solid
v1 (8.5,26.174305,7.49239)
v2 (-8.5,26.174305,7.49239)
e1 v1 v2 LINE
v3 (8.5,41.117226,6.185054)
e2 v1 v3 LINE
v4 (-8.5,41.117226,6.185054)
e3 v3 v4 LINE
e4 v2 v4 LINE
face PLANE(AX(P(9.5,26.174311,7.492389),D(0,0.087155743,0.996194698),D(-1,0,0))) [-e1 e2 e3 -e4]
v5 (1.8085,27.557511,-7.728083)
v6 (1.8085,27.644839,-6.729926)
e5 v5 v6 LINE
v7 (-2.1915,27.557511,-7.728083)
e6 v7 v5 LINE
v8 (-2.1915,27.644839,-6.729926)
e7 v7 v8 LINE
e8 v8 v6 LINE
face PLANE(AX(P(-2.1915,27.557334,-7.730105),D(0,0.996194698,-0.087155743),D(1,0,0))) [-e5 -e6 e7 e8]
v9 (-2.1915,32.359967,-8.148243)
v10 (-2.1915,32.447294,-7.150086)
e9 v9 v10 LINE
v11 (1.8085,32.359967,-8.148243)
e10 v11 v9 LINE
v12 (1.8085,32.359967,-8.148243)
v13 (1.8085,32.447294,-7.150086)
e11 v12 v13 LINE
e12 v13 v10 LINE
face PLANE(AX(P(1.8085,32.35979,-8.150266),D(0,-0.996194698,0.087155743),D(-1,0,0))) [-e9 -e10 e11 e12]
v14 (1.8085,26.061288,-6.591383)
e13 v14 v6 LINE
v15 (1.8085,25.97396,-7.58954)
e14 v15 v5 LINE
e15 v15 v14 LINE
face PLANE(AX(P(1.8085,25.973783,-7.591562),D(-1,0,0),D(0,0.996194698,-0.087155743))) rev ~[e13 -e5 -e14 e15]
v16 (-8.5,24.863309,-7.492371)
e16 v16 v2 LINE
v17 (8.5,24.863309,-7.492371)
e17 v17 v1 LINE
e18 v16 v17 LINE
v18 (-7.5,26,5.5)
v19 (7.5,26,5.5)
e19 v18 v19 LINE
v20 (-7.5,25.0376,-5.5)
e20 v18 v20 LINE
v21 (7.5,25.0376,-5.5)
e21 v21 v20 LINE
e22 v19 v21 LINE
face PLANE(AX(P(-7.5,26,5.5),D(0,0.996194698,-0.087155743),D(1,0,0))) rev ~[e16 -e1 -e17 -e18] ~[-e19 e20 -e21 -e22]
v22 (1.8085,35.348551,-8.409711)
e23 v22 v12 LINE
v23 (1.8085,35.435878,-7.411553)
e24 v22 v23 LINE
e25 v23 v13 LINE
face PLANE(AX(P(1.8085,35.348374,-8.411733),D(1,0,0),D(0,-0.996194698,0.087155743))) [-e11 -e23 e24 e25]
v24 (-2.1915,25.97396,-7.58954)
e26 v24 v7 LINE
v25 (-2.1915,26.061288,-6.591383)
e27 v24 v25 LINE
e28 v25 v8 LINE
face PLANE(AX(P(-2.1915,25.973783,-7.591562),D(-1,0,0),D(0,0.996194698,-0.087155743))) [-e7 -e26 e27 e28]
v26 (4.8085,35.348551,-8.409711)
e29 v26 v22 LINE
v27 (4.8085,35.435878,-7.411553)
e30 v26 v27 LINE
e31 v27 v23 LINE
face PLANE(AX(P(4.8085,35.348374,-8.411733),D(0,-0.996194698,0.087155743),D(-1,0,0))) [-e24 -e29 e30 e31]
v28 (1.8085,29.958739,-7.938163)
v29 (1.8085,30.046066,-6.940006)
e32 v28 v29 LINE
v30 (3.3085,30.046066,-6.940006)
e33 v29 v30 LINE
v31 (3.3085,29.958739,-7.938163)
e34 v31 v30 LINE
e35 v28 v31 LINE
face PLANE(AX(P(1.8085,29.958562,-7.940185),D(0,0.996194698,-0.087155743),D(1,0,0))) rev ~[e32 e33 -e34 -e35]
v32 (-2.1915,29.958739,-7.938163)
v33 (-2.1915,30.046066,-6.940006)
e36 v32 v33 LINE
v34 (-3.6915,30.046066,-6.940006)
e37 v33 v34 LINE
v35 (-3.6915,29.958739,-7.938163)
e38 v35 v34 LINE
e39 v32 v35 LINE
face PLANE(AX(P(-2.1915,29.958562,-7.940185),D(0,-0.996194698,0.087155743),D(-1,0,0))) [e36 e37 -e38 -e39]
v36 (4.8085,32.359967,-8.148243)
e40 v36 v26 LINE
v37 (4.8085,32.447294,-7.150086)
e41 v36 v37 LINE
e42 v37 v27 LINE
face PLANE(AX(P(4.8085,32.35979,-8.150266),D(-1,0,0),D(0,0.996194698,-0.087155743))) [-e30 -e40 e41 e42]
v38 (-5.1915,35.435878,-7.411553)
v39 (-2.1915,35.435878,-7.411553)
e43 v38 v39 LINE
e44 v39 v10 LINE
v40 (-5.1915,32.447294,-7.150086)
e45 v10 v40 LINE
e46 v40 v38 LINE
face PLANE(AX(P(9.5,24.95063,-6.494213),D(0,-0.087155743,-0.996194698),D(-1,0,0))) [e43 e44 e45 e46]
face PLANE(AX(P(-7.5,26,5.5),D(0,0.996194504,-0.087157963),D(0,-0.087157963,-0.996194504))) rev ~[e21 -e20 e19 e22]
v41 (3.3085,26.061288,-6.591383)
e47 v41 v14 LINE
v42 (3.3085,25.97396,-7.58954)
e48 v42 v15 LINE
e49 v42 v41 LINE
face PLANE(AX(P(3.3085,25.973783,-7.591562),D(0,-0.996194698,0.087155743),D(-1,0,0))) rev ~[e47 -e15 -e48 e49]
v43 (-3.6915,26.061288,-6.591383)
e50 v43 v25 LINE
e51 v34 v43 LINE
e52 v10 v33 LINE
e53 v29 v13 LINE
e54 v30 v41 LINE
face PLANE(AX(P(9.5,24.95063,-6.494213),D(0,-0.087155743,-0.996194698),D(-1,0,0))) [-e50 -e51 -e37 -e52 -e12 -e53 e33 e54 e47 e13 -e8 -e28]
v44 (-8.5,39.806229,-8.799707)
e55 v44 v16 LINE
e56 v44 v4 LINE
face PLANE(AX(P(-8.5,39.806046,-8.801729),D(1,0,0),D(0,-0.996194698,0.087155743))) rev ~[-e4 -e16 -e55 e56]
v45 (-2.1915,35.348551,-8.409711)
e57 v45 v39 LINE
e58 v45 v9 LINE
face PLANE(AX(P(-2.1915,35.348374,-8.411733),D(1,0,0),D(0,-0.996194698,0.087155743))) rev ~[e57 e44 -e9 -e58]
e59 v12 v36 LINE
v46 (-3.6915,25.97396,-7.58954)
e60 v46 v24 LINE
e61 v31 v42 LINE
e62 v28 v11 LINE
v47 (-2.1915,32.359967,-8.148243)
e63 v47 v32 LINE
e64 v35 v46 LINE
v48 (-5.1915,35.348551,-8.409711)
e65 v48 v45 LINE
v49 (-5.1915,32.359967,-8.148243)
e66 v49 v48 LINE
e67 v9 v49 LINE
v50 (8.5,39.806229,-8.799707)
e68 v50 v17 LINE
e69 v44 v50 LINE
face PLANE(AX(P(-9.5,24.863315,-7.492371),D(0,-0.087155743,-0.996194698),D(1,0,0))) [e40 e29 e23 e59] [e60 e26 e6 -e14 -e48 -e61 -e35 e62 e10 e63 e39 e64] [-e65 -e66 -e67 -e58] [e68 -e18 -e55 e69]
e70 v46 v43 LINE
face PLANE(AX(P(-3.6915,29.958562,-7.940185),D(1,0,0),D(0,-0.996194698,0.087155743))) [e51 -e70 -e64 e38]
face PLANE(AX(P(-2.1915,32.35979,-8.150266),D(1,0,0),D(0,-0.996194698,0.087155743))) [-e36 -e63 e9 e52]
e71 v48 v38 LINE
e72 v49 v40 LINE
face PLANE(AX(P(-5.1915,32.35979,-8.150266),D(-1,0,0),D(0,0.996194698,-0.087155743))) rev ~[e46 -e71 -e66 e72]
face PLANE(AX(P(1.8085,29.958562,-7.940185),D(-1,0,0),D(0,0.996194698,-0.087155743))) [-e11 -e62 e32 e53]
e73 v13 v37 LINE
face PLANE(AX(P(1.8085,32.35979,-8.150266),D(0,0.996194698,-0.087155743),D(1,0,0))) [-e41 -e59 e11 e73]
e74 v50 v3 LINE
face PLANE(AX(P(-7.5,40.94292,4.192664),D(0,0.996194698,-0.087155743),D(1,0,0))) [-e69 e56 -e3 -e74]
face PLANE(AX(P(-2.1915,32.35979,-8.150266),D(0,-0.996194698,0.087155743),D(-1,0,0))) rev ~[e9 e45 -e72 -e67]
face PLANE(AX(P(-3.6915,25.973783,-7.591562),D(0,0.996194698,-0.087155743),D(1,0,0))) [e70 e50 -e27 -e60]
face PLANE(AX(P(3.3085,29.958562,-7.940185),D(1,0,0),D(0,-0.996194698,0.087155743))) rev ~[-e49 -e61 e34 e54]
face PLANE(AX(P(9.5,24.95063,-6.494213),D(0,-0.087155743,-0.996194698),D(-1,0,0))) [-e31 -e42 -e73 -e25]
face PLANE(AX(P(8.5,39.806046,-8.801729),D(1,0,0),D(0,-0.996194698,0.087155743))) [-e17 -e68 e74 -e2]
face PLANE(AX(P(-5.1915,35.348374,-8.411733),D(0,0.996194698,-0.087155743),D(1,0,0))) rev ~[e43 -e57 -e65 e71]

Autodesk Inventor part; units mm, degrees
ref_plane "YZ Plane" through (0, 0, 0) normal (1, 0, 0) x (0, 1, 0)
ref_plane "XZ Plane" through (0, 0, 0) normal (0, 1, 0) x (-1, 0, 0)
ref_plane "XY Plane" through (0, 0, 0) normal (0, 0, 1) x (1, 0, 0)
sketch "スケッチ1" plane through (0, 0, 0) normal (0, 1, 0) x (-1, 0, 0)
  line L0 (-7.5, -10) -> (7.5, -10)
  line L1 (7.5, -10) -> (7.5, 10)
  line L2 (7.5, 10) -> (-7.5, 10)
  line L3 (-7.5, 10) -> (-7.5, -10)
  line L4 (-7.5, -10) -> (7.5, 10) construction
  line L5 (7.5, -10) -> (-7.5, 10) construction
  line L6 (-7.5, 10) -> (7.5, 10)
  line L7 (7.5, 10) -> (7.5, 4)
  line L8 (7.5, 4) -> (-7.5, 4)
  line L9 (-7.5, 4) -> (-7.5, 10)
  line L10 (-7.5, -10) -> (7.5, -10)
  line L11 (7.5, -10) -> (7.5, -4)
  line L12 (7.5, -4) -> (-7.5, -4)
  line L13 (-7.5, -4) -> (-7.5, -10)
  point P0 (0, 0)
  dimension "d0" = 15
  dimension "d1" = 20
  dimension "d2" = 6
  dimension "d3" = 6
extrude "押し出し1" add sketch "スケッチ1" along normal blind 6 contours L3 L12 L1 L0 | L3 L2 L1 L8
sketch "スケッチ2" plane through (0, 6, 0) normal (0, 1, 0) x (1, 0, 0)
  line L0 (7.5, 10) -> (-7.5, 10) projected
  line L1 (-7.5, 10) -> (-7.5, 4) projected
  line L2 (-7.5, 4) -> (7.5, 4) projected
  line L3 (7.5, 4) -> (7.5, 10) projected
  line L4 (-7.5, -5.5) -> (7.5, -5.5)
  line L5 (7.5, -5.5) -> (7.5, 5.5)
  line L6 (7.5, 5.5) -> (-7.5, 5.5)
  line L7 (-7.5, 5.5) -> (-7.5, -5.5)
  line L8 (-7.5, -5.5) -> (7.5, 5.5) construction
  line L9 (7.5, -5.5) -> (-7.5, 5.5) construction
  point P0 (0, 0)
  dimension "d6" = 11
extrude "押し出し2" add sketch "スケッチ2" along normal blind 20 contours L3 L2 L1 L6 | L5 L4 L7 L2
sketch "スケッチ3" plane through (7.5, 0, -4) normal (1, 0, 0) x (0, 0, -1)
  line L0 (1.5, 6) -> (1.5, 26) projected
  line L1 (-9.5, 26) -> (1.5, 26) projected
  line L2 (-9.5, 26) -> (1.5, 25.0376)
  point P0 (-4, 0)
  dimension "d9" = 5
extrude "押し出し3" cut sketch "スケッチ3" against normal blind 20
sketch "スケッチ4" plane through (-7.5, 26, 5.5) normal (0, 0.9961947, -0.0871557) x (1, 0, 0)
  line L0 (0, 0) -> (0, 11.042) projected
  line L1 (0, 0) -> (15, 0) projected
  line L2 (15, 11.042) -> (15, 0) projected
  line L3 (0, 11.042) -> (15, 11.042) projected
  line L4 (-2, 13.042) -> (17, 13.042)
  line L5 (17, 13.042) -> (17, -2)
  line L6 (17, -2) -> (-2, -2)
  line L7 (-2, -2) -> (-2, 13.042)
  point P0 (7.5, 7.7451)
  dimension "d12" = 2
  dimension "d13" = 2
  dimension "d14" = 2
  dimension "d15" = 2
extrude "押し出し4" add sketch "スケッチ4" along normal blind 15 contours L0 L3 L2 L1 | L4 L5 L6 L7
sketch "スケッチ5" plane through (9.5, 24.8633, -7.4924) normal (0, -0.0871557, -0.9961947) x (-1, 0, 0)
  line L0 (19, 0) -> (0, 0) projected
  line L1 (11.6915, 7.5253) -> (11.6915, 2.7045)
  line L2 (11.6915, 2.7045) -> (7.6915, 2.7045)
  line L3 (7.6915, 2.7045) -> (7.6915, 7.5253)
  line L4 (9.6915, 7.5253) -> (11.6915, 2.7045) construction
  line L5 (9.6915, 7.5253) -> (7.6915, 2.7045) construction
  line L6 (7.6915, 7.5253) -> (11.6915, 7.5253)
  line L7 (11.6915, 5.1149) -> (13.1915, 5.1149)
  line L8 (13.1915, 5.1149) -> (13.1915, 1.1149)
  line L9 (13.1915, 1.1149) -> (11.6915, 1.1149)
  line L10 (11.6915, 1.1149) -> (11.6915, 5.1149)
  line L11 (7.6915, 5.1149) -> (6.1915, 5.1149)
  line L12 (6.1915, 5.1149) -> (6.1915, 1.1149)
  line L13 (6.1915, 1.1149) -> (7.6915, 1.1149)
  line L14 (7.6915, 1.1149) -> (7.6915, 5.1149)
  line L15 (11.6915, 7.5253) -> (14.6915, 7.5253)
  line L16 (14.6915, 7.5253) -> (14.6915, 10.5253)
  line L17 (14.6915, 10.5253) -> (11.6915, 10.5253)
  line L18 (11.6915, 10.5253) -> (11.6915, 7.5253)
  line L19 (7.6915, 7.5253) -> (4.6915, 7.5253)
  line L20 (4.6915, 7.5253) -> (4.6915, 10.5253)
  line L21 (4.6915, 10.5253) -> (7.6915, 10.5253)
  line L22 (7.6915, 10.5253) -> (7.6915, 7.5253)
  point P0 (9.5, -25.4217)
  dimension "d18" = 4
  dimension "d19" = 1.5
  dimension "d20" = 4
  dimension "d21" = 1.5
  dimension "d22" = 3
  dimension "d23" = 3
  dimension "d24" = 3
  dimension "d25" = 2.7045
extrude "押し出し5" cut sketch "スケッチ5" against normal blind 1
sketch "スケッチ6" plane through (7.5, 0, 10) normal (1, 0, 0) x (0, 0, -1)
  line L0 (4.5, 6) -> (4.5, 26) projected
  line L1 (0, 6) -> (4.5, 6) projected
  line L2 (0, 0) -> (0, 6) projected
  line L3 (0, 0) -> (6, 0) projected
  line L4 (6, 0) -> (6, 6) projected
  line L5 (6, 6) -> (14, 6) projected
  line L6 (14, 0) -> (14, 6) projected
  line L7 (14, 0) -> (20, 0) projected
  line L8 (20, 0) -> (20, 6) projected
  line L9 (15.5, 6) -> (20, 6) projected
  line L10 (15.5, 6) -> (15.5, 25.0376) projected
  line L11 (15.5, 25.0376) -> (4.5, 25.0376)
  point P0 (10, 0)
extrude "押し出し6" cut sketch "スケッチ6" against normal blind 100
sketch "スケッチ7" plane through (-7.5, 25.0376, 5.5) normal (-1, 0, 0) x (0, 0, 1)
  line L0 (-11, 0) -> (0, 0) projected
  line L1 (0, 0) -> (0, 0.9624) projected
  line L2 (0, 0.9624) -> (-11, 0) projected
  point P0 (-5.5, -25.0376)
extrude "押し出し7" cut sketch "スケッチ7" against normal blind 100
sketch "スケッチ8" plane through (9.5, 24.8633, -7.4924) normal (0, -0.0871557, -0.9961947) x (-1, 0, 0)
  line L0 (19, 0) -> (0, 0) projected
  line L1 (19, 0) -> (19, 15) projected
  line L2 (0, 15) -> (19, 15) projected
  line L3 (0, 0) -> (0, 15) projected
  line L4 (1, 15) -> (1, 0)
  line L5 (18, 15) -> (18, 0)
  point P0 (9.5, -25.4217)
  dimension "d32" = 1
  dimension "d33" = 1
extrude "押し出し8" cut sketch "スケッチ8" against normal blind 100 contours L0 L5 L2 L1 | L0 L3 L2 L4
